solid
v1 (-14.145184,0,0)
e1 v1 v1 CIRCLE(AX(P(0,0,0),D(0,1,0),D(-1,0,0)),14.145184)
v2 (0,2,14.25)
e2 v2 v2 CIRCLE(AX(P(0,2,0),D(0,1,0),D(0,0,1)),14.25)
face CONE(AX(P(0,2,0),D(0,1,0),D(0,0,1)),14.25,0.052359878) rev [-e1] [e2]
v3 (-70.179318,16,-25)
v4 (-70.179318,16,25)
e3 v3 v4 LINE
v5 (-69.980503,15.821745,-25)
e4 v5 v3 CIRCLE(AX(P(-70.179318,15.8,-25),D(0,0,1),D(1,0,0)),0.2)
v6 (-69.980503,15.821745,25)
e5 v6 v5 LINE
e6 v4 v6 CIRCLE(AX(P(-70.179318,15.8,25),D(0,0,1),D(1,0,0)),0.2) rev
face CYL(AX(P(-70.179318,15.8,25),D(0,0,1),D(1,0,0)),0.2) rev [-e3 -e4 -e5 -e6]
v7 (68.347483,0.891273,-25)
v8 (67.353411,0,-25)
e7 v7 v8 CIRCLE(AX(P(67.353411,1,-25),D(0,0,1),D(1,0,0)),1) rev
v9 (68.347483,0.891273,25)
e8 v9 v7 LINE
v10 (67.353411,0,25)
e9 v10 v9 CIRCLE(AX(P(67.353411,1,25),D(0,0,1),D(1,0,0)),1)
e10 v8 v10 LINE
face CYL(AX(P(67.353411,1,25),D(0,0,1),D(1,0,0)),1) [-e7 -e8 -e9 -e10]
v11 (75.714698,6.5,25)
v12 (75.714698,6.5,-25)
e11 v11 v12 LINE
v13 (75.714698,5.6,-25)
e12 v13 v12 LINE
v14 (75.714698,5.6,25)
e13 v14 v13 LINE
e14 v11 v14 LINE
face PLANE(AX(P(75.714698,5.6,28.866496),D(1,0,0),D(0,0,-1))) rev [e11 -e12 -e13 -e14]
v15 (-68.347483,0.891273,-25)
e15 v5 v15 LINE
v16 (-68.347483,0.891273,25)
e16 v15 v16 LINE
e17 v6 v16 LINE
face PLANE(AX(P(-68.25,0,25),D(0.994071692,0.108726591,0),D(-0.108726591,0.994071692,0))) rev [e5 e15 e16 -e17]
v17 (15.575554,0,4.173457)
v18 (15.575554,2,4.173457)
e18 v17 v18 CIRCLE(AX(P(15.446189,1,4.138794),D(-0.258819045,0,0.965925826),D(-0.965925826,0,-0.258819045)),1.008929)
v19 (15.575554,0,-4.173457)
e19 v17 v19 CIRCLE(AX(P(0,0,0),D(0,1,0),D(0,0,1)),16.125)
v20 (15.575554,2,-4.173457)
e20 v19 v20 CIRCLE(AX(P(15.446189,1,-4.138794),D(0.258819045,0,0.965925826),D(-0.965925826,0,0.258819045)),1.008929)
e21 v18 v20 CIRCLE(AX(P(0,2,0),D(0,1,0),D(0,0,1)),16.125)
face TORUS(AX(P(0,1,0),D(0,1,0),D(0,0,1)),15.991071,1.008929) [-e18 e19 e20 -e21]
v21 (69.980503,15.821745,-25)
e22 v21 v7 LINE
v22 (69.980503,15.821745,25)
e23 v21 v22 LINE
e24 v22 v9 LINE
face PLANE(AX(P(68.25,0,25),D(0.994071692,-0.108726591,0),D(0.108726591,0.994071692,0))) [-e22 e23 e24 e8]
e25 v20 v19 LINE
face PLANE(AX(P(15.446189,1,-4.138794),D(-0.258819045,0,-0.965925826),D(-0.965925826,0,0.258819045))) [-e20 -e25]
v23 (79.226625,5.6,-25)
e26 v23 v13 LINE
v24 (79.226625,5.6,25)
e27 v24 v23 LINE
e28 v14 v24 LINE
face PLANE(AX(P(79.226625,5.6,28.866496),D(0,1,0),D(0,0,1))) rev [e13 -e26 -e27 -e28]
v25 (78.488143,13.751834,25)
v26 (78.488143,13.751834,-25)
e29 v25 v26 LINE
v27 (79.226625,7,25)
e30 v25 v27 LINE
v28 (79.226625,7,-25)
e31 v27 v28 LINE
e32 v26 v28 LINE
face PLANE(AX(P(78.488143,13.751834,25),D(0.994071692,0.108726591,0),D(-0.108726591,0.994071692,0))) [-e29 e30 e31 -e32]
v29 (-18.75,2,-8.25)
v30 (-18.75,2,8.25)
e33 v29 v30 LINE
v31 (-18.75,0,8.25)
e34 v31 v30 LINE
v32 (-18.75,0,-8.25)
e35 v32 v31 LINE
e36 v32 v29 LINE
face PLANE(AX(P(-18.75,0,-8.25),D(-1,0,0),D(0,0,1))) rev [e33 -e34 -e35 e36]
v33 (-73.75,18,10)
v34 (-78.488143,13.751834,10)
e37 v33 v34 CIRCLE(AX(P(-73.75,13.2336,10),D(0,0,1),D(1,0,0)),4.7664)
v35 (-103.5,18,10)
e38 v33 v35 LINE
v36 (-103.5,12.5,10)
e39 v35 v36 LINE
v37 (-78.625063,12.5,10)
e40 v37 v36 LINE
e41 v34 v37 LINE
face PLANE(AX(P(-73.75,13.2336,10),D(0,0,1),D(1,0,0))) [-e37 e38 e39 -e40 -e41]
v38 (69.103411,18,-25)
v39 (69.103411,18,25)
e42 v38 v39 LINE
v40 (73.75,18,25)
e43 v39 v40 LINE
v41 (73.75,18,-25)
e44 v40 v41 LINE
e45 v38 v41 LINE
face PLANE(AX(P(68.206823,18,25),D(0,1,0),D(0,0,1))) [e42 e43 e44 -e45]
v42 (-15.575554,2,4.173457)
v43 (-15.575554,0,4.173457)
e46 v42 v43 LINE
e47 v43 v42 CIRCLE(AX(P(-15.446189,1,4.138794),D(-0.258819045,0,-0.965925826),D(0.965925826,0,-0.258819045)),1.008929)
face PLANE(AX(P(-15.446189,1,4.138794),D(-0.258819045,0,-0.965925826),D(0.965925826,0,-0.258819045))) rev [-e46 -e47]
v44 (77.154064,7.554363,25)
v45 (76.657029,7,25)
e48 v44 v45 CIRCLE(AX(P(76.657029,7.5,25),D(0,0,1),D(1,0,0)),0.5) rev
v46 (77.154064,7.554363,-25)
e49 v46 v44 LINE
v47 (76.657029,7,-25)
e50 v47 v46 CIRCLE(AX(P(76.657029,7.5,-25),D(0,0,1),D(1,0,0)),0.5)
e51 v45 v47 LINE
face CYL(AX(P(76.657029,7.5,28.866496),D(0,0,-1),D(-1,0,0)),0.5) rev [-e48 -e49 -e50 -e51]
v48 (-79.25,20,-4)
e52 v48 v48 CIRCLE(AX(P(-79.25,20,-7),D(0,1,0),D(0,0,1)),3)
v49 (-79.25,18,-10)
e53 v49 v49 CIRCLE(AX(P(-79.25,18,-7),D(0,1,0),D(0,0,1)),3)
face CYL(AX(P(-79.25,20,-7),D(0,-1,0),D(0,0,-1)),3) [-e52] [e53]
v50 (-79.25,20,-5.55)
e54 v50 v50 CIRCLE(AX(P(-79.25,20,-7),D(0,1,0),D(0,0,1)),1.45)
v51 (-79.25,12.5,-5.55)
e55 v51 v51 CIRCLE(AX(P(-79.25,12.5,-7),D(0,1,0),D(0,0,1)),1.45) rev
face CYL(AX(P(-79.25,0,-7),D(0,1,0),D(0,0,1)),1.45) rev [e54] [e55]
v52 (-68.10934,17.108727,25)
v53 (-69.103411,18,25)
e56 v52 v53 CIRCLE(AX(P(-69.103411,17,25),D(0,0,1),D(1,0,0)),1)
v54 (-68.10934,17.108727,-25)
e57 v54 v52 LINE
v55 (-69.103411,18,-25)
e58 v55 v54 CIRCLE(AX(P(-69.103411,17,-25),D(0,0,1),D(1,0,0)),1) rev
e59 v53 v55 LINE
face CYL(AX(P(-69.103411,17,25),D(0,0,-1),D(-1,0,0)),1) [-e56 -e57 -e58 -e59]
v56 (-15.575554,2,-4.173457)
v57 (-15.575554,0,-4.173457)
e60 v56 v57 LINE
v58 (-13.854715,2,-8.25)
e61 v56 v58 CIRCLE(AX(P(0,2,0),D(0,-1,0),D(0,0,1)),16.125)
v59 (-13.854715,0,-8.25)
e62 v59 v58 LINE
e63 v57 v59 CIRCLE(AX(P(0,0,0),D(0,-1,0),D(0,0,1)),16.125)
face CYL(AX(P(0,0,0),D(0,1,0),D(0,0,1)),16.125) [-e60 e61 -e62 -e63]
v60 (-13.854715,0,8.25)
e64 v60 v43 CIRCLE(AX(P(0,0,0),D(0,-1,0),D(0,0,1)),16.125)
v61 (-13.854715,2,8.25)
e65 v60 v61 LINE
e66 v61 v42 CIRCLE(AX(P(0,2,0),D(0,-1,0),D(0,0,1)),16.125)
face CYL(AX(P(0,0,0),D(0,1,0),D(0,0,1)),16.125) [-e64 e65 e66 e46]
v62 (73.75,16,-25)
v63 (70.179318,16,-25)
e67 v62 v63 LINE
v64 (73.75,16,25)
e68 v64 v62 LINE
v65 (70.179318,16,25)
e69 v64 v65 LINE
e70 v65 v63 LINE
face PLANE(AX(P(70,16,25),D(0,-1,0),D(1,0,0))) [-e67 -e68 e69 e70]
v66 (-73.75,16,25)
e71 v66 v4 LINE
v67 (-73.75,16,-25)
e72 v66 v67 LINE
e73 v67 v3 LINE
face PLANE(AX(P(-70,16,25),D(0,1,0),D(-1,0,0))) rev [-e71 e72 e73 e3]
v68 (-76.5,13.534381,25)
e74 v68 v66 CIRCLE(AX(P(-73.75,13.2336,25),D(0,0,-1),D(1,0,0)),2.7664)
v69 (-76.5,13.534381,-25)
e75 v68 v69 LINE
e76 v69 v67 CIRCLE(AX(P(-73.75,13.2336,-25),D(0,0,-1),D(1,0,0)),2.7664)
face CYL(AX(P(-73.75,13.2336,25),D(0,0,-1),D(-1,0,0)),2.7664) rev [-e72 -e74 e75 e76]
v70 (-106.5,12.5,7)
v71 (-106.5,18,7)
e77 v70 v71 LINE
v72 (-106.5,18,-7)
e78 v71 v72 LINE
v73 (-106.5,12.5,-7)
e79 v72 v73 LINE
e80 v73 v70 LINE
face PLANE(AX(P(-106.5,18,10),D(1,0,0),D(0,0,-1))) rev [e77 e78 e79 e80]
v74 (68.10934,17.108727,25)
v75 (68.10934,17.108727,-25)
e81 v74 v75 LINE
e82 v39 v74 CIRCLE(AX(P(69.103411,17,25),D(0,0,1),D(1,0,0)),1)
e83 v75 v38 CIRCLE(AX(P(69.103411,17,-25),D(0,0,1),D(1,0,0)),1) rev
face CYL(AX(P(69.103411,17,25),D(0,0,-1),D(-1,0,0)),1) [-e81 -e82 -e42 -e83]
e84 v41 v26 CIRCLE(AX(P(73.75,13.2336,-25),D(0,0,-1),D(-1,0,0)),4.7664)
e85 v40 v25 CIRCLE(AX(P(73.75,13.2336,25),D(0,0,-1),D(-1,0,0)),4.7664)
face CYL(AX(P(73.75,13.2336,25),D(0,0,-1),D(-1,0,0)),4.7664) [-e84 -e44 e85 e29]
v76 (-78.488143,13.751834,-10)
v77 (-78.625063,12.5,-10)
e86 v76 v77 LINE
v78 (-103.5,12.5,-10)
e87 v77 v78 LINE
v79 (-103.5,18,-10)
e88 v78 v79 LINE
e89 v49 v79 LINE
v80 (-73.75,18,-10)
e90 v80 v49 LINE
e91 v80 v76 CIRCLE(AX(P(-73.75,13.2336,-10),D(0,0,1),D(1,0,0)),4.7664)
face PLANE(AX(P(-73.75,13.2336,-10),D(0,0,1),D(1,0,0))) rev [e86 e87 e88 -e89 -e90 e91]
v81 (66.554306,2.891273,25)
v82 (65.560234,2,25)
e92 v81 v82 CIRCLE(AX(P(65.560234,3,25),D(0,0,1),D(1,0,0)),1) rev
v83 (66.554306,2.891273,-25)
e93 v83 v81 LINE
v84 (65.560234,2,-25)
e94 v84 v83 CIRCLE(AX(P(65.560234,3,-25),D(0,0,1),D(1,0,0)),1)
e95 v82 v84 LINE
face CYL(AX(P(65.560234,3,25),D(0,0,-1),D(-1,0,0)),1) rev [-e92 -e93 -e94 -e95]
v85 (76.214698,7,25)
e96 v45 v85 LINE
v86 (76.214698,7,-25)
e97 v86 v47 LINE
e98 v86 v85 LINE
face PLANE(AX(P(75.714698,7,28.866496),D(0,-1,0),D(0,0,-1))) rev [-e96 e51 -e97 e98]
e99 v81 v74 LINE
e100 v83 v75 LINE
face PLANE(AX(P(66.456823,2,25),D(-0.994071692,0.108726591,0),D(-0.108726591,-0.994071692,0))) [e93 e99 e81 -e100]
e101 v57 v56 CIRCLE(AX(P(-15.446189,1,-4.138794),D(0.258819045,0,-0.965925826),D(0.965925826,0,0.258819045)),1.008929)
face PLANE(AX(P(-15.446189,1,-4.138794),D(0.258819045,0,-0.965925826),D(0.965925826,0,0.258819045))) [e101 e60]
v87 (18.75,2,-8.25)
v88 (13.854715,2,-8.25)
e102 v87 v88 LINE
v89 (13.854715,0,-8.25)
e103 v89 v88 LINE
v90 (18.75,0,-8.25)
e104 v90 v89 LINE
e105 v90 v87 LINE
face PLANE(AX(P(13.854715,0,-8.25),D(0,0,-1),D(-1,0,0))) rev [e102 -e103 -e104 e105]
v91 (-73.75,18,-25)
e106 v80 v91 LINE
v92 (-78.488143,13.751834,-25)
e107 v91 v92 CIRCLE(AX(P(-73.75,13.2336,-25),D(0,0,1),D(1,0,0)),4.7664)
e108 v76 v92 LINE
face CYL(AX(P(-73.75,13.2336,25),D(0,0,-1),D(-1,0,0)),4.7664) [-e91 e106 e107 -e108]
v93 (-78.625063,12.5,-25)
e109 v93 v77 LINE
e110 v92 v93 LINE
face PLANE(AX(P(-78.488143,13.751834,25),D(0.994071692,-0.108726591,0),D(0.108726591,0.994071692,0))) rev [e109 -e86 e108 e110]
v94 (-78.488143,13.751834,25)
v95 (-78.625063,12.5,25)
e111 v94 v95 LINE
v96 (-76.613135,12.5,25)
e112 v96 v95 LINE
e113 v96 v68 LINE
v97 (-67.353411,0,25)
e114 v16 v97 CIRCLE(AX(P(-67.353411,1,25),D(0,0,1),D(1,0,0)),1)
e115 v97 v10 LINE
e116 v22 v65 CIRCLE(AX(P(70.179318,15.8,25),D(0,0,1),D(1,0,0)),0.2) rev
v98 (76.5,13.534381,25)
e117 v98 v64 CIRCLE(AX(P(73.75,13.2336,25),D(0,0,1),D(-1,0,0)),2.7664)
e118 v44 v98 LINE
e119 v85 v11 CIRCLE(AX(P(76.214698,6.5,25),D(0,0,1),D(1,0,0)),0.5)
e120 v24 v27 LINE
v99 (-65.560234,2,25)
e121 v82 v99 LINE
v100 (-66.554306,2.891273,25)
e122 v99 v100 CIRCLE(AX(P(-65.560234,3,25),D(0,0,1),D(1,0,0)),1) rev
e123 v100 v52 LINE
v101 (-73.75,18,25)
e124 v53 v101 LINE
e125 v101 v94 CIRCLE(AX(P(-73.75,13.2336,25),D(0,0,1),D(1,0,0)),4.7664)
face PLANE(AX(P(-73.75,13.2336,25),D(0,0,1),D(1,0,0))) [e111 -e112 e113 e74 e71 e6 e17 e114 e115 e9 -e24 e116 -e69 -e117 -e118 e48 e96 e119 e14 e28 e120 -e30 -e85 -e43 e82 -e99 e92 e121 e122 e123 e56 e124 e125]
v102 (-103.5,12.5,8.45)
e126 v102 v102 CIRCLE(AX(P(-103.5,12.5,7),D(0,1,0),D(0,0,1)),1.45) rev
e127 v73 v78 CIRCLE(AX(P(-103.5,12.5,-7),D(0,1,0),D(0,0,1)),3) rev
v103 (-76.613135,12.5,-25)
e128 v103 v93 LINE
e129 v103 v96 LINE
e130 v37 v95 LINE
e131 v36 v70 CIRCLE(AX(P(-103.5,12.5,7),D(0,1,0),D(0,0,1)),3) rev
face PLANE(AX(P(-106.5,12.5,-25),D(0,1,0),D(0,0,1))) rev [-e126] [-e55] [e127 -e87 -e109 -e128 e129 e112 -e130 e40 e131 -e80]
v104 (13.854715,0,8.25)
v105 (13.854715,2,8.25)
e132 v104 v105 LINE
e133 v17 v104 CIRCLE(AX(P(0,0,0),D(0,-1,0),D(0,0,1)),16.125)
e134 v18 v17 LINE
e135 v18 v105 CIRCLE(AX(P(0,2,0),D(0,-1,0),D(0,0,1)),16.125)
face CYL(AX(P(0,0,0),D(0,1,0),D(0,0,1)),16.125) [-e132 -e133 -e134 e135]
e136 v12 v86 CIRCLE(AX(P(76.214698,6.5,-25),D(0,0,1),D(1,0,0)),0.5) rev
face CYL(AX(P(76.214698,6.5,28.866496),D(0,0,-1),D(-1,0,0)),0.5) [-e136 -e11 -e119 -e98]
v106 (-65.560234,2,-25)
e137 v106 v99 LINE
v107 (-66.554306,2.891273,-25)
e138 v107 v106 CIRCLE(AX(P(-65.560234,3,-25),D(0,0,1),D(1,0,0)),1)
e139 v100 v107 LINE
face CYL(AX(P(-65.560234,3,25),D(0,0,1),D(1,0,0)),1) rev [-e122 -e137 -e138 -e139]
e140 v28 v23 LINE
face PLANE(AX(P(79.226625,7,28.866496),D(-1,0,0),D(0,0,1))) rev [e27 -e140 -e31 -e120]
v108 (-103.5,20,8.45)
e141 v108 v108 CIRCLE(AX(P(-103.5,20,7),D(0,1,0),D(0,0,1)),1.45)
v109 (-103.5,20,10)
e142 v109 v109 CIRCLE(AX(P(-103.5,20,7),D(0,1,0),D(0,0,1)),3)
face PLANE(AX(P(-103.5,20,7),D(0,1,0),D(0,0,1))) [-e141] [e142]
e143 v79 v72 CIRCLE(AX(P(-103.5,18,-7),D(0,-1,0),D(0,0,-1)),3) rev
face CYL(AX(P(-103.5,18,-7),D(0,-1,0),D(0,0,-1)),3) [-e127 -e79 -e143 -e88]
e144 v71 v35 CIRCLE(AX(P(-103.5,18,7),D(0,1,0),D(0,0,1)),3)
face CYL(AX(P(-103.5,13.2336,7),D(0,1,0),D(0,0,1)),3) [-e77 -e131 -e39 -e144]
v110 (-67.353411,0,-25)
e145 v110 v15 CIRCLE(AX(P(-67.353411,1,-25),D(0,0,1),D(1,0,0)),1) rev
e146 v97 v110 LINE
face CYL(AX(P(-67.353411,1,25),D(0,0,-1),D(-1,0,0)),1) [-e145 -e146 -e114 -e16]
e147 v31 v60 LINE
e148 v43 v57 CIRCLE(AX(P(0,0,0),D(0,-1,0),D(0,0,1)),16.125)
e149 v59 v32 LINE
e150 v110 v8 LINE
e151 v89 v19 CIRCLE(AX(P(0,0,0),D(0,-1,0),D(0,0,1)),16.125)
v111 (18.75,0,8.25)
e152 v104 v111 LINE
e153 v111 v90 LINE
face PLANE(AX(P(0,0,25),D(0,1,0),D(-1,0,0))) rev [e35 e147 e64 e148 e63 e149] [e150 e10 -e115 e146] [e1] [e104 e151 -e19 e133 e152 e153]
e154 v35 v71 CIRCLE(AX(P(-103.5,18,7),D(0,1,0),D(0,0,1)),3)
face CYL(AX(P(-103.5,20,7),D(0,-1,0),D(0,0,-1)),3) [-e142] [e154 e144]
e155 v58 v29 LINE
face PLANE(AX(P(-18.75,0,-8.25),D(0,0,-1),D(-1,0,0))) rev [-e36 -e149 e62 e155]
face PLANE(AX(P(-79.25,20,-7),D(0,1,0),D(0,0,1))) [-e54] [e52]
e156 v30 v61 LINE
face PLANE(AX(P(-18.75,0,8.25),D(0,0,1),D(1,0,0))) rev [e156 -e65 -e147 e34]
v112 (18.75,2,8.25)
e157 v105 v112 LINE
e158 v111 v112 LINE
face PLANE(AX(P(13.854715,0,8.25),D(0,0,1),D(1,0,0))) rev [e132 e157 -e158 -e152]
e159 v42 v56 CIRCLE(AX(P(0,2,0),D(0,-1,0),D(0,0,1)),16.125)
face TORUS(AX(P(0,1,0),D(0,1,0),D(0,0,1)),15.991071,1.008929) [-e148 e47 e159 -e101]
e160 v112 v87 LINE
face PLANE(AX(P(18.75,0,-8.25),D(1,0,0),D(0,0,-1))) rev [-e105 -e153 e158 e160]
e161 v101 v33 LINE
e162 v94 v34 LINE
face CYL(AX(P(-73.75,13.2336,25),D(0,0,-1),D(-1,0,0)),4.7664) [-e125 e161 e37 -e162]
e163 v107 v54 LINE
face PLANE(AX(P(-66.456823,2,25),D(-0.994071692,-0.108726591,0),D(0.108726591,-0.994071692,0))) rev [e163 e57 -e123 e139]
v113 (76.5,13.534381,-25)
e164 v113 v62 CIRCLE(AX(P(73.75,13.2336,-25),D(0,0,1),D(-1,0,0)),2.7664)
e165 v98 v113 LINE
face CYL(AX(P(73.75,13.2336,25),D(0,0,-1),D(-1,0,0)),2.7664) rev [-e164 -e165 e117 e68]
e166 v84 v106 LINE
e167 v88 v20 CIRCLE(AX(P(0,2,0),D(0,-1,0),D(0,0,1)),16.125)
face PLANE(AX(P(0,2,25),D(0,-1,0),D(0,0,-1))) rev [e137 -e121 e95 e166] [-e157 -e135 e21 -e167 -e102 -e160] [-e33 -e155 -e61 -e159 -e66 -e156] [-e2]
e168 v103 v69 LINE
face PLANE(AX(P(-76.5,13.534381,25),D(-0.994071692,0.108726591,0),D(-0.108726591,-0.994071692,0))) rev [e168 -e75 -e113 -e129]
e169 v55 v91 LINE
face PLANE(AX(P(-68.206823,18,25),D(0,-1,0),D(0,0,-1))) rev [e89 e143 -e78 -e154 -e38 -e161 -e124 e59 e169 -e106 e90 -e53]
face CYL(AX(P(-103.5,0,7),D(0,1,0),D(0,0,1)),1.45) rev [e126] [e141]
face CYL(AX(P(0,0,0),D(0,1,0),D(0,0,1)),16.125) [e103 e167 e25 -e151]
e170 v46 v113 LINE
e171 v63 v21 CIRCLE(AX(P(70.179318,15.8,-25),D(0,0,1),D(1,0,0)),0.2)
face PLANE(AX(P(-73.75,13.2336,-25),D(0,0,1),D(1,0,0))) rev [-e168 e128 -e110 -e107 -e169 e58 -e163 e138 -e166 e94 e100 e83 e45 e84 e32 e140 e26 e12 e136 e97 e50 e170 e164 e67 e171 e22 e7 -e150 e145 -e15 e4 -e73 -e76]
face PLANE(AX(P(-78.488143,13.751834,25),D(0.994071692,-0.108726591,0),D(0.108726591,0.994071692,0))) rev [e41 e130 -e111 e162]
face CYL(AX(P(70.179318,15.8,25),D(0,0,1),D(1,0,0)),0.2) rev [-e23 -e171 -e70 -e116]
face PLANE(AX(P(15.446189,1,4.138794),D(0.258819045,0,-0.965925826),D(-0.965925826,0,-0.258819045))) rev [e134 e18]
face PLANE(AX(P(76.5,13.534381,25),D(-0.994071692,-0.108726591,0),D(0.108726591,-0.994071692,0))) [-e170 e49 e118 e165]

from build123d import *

# Parameters (mm, degrees)
BOSS_EXTRUDE1_DEPTH     = 25
SKETCH2_R               = 14.25
CUT_EXTRUDE1_DEPTH      = 50
CUT_EXTRUDE1_DRAFT      = -3
CUT_EXTRUDE2_DEPTH      = 85.581854283
REVOLVE1_ANGLE          = 30
FILLET1_R               = 0.2
FILLET4_R               = 1
BOSS_EXTRUDE2_START     = -25
BOSS_EXTRUDE2_DEPTH     = 50
FILLET5_R               = 0.5
BOSS_EXTRUDE3_DEPTH     = 10
SKETCH7_R               = 1.45
CUT_EXTRUDE3_DEPTH      = 111.865909999
BOSS_EXTRUDE5_START     = 2
SKETCH9_R               = 3
SKETCH9_R_2             = 1.45
BOSS_EXTRUDE5_DEPTH     = 2
FILLET6_R               = 3
CUT_EXTRUDE4_DEPTH      = 112.208138191
CUT_EXTRUDE4_DEPTH_BACK = 112.208138191
SKETCH10_W              = 29.886864559
SKETCH10_H              = 5.5


with BuildPart() as part:
    # Sketch1 → Boss-Extrude1 (new, symmetric)
    with BuildSketch(Plane.XY):
        with BuildLine():
            Line((0, 0), (-68.25, 0))
            Line((-68.25, 0), (-70, 16))
            Line((-70, 16), (-73.75, 16))
            ThreePointArc((-73.75, 16), (-75.596738759, 15.293339066), (-76.5, 13.534381178))
            Line((-76.5, 13.534381178), (-77.214697941, 7))
            Line((-77.214697941, 7), (-79.202841325, 7.217453183))
            Line((-79.202841325, 7.217453183), (-78.488143384, 13.75183436))
            ThreePointArc((-78.488143384, 13.75183436), (-76.931859285, 16.782450607), (-73.75, 18))
            Line((-73.75, 18), (-68.206822675, 18))
            Line((-68.206822675, 18), (-66.456822675, 2))
            Line((-66.456822675, 2), (0, 2))
            Line((0, 2), (0, 0))
        make_face()
    boss_extrude1 = extrude(amount=BOSS_EXTRUDE1_DEPTH, both=True)

    # Mirror1: Boss-Extrude1 across plane
    add(boss_extrude1.mirror(Plane(origin=(0, 0, 25), x_dir=(0, 0, 1), z_dir=(-1, 0, 0))))


with BuildPart() as cut_extrude1_tool:
    # Sketch2 → Cut-Extrude1 (with draft: the straight prism first)
    with BuildSketch(Plane(origin=(0, 2, 0), x_dir=(1, 0, 0), z_dir=(0, 1, 0))):
        Circle(SKETCH2_R)
    extrude(amount=-CUT_EXTRUDE1_DEPTH)
    # Cut-Extrude1: the draft: its side faces are tilted about the plane it starts from
    cut_extrude1_sides = [cut_extrude1_tool.faces().sort_by_distance(p)[0] for p in [
        (-14.25, -23, 0),
    ]]
    draft(cut_extrude1_sides, Plane(origin=(0, 2, 0), x_dir=(1, 0, 0), z_dir=(0, 1, 0)), CUT_EXTRUDE1_DRAFT)


with BuildPart() as part_1:
    add(part.part)

    # Cut-Extrude1: cut by cut_extrude1_tool
    add(cut_extrude1_tool.part, mode=Mode.SUBTRACT)

    # Sketch3 → Cut-Extrude2 (cut, through all)
    with BuildSketch(Plane(origin=(0, 2, 0), x_dir=(1, 0, 0), z_dir=(0, 1, 0))):
        with BuildLine():
            Line((-18.75, 8.25), (-18.75, -8.25))
            Line((-18.75, -8.25), (-13.854714901, -8.25))
            ThreePointArc((-13.854714901, -8.25), (-16.125, 0), (-13.854714901, 8.25))
            Line((-13.854714901, 8.25), (-18.75, 8.25))
        make_face()
        with BuildLine():
            Line((18.75, 8.25), (18.75, -8.25))
            Line((18.75, -8.25), (13.854714901, -8.25))
            ThreePointArc((13.854714901, -8.25), (16.125, 0), (13.854714901, 8.25))
            Line((13.854714901, 8.25), (18.75, 8.25))
        make_face()
    extrude(amount=-CUT_EXTRUDE2_DEPTH, mode=Mode.SUBTRACT)

    # Sketch4 → Revolve1 (revolve, symmetric)
    with BuildSketch(Plane.XY) as revolve1_sk:
        with BuildLine():
            Line((16.125, 0), (16.125, 2))
            ThreePointArc((16.125, 2), (17, 1), (16.125, 0))
        make_face()
    revolve1 = revolve(axis=Axis((0, 2, 0), (0, 1, 0)), revolution_arc=REVOLVE1_ANGLE / 2)
    revolve1 = revolve1 + revolve(revolve1_sk.sketch, axis=Axis((0, 2, 0), (0, -1, 0)), revolution_arc=REVOLVE1_ANGLE / 2)

    # Mirror2: Revolve1 across plane
    add(revolve1.mirror(Plane(origin=(0, 0, 0), x_dir=(0, 0, 1), z_dir=(1, 0, 0))))

    # Fillet1
    fillet1_edges = [part_1.edges().sort_by_distance(p)[0] for p in [
        (-70, 16, 0),
        (70, 16, 0),
    ]]
    fillet(fillet1_edges, radius=FILLET1_R)

    # Fillet4
    fillet4_edges = [part_1.edges().sort_by_distance(p)[0] for p in [
        (-68.25, 0, 0),
        (-68.206822675, 18, 0),
        (-66.456822675, 2, 0),
        (68.25, 0, 0),
        (68.206822675, 18, 0),
        (66.456822675, 2, 0),
    ]]
    fillet(fillet4_edges, radius=FILLET4_R)

    # Sketch6 → Boss-Extrude2 (add)
    with BuildSketch(Plane.XY.offset(BOSS_EXTRUDE2_START)):
        Polygon((79.226625267, 7), (79.226625267, 5.6), (75.714697941, 5.6), (75.714697941, 7), (77.214697941, 7), (79.202841325, 7.217453183), align=None)
    extrude(amount=BOSS_EXTRUDE2_DEPTH)

    # Fillet5
    fillet5_edges = [part_1.edges().sort_by_distance(p)[0] for p in [
        (75.714697941, 7, 0),
        (77.214697941, 7, 0),
    ]]
    fillet(fillet5_edges, radius=FILLET5_R)

    # Sketch5 → Boss-Extrude3 (add, symmetric)
    with BuildSketch(Plane.XY):
        with BuildLine():
            Line((-73.75, 18), (-106.5, 18))
            Line((-106.5, 18), (-106.5, 7))
            Line((-106.5, 7), (-77.214697941, 7))
            Line((-77.214697941, 7), (-76.5, 13.534381178))
            ThreePointArc((-76.5, 13.534381178), (-75.596738759, 15.293339066), (-73.75, 16))
            Line((-73.75, 16), (-73.75, 18))
        make_face()
    extrude(amount=BOSS_EXTRUDE3_DEPTH, both=True)

    # Sketch7 → Cut-Extrude3 (cut, through all)
    with BuildSketch(Plane(origin=(0, 18, 0), x_dir=(1, 0, 0), z_dir=(0, 1, 0))):
        with Locations(Location((-79.25, 7, 0), (0, 0, 270))):
            Circle(SKETCH7_R)
        with Locations(Location((-103.5, -7, 0), (0, 0, 270))):
            Circle(SKETCH7_R)
    extrude(amount=-CUT_EXTRUDE3_DEPTH, mode=Mode.SUBTRACT)

    # Sketch9 → Boss-Extrude5 (add)
    # profile 1 of 2: a face of its own
    with BuildSketch(Plane(origin=(0, 18, 0), x_dir=(1, 0, 0), z_dir=(0, 1, 0)).offset(BOSS_EXTRUDE5_START)):
        with Locations(Location((-79.25, 7, 0), (0, 0, 90))):
            Circle(SKETCH9_R)
        with Locations(Location((-79.25, 7, 0), (0, 0, 270))):
            Circle(SKETCH9_R_2, mode=Mode.SUBTRACT)
    # profile 2 of 2: a face of its own
    with BuildSketch(Plane(origin=(0, 18, 0), x_dir=(1, 0, 0), z_dir=(0, 1, 0)).offset(BOSS_EXTRUDE5_START)):
        with Locations(Location((-103.5, -7, 0), (0, 0, 270))):
            Circle(SKETCH9_R)
        with Locations(Location((-103.5, -7, 0), (0, 0, 270))):
            Circle(SKETCH9_R_2, mode=Mode.SUBTRACT)
    extrude(amount=-BOSS_EXTRUDE5_DEPTH)

    # Fillet6
    fillet6_edges = [part_1.edges().sort_by_distance(p)[0] for p in [
        (-106.5, 12.5, 10),
        (-106.5, 12.5, -10),
    ]]
    fillet(fillet6_edges, radius=FILLET6_R - 0.0001)  # a hair under: the kernel refuses the full size

    # Sketch10 → Cut-Extrude4 (cut, two sides: drawn at the far end of the back side and taken through both)
    with BuildSketch(Plane.XY.offset(-CUT_EXTRUDE4_DEPTH_BACK)):
        with Locations((-91.55656772, 9.75)):
            Rectangle(SKETCH10_W, SKETCH10_H)
    extrude(amount=CUT_EXTRUDE4_DEPTH + CUT_EXTRUDE4_DEPTH_BACK, mode=Mode.SUBTRACT)


solid = part_1.part
